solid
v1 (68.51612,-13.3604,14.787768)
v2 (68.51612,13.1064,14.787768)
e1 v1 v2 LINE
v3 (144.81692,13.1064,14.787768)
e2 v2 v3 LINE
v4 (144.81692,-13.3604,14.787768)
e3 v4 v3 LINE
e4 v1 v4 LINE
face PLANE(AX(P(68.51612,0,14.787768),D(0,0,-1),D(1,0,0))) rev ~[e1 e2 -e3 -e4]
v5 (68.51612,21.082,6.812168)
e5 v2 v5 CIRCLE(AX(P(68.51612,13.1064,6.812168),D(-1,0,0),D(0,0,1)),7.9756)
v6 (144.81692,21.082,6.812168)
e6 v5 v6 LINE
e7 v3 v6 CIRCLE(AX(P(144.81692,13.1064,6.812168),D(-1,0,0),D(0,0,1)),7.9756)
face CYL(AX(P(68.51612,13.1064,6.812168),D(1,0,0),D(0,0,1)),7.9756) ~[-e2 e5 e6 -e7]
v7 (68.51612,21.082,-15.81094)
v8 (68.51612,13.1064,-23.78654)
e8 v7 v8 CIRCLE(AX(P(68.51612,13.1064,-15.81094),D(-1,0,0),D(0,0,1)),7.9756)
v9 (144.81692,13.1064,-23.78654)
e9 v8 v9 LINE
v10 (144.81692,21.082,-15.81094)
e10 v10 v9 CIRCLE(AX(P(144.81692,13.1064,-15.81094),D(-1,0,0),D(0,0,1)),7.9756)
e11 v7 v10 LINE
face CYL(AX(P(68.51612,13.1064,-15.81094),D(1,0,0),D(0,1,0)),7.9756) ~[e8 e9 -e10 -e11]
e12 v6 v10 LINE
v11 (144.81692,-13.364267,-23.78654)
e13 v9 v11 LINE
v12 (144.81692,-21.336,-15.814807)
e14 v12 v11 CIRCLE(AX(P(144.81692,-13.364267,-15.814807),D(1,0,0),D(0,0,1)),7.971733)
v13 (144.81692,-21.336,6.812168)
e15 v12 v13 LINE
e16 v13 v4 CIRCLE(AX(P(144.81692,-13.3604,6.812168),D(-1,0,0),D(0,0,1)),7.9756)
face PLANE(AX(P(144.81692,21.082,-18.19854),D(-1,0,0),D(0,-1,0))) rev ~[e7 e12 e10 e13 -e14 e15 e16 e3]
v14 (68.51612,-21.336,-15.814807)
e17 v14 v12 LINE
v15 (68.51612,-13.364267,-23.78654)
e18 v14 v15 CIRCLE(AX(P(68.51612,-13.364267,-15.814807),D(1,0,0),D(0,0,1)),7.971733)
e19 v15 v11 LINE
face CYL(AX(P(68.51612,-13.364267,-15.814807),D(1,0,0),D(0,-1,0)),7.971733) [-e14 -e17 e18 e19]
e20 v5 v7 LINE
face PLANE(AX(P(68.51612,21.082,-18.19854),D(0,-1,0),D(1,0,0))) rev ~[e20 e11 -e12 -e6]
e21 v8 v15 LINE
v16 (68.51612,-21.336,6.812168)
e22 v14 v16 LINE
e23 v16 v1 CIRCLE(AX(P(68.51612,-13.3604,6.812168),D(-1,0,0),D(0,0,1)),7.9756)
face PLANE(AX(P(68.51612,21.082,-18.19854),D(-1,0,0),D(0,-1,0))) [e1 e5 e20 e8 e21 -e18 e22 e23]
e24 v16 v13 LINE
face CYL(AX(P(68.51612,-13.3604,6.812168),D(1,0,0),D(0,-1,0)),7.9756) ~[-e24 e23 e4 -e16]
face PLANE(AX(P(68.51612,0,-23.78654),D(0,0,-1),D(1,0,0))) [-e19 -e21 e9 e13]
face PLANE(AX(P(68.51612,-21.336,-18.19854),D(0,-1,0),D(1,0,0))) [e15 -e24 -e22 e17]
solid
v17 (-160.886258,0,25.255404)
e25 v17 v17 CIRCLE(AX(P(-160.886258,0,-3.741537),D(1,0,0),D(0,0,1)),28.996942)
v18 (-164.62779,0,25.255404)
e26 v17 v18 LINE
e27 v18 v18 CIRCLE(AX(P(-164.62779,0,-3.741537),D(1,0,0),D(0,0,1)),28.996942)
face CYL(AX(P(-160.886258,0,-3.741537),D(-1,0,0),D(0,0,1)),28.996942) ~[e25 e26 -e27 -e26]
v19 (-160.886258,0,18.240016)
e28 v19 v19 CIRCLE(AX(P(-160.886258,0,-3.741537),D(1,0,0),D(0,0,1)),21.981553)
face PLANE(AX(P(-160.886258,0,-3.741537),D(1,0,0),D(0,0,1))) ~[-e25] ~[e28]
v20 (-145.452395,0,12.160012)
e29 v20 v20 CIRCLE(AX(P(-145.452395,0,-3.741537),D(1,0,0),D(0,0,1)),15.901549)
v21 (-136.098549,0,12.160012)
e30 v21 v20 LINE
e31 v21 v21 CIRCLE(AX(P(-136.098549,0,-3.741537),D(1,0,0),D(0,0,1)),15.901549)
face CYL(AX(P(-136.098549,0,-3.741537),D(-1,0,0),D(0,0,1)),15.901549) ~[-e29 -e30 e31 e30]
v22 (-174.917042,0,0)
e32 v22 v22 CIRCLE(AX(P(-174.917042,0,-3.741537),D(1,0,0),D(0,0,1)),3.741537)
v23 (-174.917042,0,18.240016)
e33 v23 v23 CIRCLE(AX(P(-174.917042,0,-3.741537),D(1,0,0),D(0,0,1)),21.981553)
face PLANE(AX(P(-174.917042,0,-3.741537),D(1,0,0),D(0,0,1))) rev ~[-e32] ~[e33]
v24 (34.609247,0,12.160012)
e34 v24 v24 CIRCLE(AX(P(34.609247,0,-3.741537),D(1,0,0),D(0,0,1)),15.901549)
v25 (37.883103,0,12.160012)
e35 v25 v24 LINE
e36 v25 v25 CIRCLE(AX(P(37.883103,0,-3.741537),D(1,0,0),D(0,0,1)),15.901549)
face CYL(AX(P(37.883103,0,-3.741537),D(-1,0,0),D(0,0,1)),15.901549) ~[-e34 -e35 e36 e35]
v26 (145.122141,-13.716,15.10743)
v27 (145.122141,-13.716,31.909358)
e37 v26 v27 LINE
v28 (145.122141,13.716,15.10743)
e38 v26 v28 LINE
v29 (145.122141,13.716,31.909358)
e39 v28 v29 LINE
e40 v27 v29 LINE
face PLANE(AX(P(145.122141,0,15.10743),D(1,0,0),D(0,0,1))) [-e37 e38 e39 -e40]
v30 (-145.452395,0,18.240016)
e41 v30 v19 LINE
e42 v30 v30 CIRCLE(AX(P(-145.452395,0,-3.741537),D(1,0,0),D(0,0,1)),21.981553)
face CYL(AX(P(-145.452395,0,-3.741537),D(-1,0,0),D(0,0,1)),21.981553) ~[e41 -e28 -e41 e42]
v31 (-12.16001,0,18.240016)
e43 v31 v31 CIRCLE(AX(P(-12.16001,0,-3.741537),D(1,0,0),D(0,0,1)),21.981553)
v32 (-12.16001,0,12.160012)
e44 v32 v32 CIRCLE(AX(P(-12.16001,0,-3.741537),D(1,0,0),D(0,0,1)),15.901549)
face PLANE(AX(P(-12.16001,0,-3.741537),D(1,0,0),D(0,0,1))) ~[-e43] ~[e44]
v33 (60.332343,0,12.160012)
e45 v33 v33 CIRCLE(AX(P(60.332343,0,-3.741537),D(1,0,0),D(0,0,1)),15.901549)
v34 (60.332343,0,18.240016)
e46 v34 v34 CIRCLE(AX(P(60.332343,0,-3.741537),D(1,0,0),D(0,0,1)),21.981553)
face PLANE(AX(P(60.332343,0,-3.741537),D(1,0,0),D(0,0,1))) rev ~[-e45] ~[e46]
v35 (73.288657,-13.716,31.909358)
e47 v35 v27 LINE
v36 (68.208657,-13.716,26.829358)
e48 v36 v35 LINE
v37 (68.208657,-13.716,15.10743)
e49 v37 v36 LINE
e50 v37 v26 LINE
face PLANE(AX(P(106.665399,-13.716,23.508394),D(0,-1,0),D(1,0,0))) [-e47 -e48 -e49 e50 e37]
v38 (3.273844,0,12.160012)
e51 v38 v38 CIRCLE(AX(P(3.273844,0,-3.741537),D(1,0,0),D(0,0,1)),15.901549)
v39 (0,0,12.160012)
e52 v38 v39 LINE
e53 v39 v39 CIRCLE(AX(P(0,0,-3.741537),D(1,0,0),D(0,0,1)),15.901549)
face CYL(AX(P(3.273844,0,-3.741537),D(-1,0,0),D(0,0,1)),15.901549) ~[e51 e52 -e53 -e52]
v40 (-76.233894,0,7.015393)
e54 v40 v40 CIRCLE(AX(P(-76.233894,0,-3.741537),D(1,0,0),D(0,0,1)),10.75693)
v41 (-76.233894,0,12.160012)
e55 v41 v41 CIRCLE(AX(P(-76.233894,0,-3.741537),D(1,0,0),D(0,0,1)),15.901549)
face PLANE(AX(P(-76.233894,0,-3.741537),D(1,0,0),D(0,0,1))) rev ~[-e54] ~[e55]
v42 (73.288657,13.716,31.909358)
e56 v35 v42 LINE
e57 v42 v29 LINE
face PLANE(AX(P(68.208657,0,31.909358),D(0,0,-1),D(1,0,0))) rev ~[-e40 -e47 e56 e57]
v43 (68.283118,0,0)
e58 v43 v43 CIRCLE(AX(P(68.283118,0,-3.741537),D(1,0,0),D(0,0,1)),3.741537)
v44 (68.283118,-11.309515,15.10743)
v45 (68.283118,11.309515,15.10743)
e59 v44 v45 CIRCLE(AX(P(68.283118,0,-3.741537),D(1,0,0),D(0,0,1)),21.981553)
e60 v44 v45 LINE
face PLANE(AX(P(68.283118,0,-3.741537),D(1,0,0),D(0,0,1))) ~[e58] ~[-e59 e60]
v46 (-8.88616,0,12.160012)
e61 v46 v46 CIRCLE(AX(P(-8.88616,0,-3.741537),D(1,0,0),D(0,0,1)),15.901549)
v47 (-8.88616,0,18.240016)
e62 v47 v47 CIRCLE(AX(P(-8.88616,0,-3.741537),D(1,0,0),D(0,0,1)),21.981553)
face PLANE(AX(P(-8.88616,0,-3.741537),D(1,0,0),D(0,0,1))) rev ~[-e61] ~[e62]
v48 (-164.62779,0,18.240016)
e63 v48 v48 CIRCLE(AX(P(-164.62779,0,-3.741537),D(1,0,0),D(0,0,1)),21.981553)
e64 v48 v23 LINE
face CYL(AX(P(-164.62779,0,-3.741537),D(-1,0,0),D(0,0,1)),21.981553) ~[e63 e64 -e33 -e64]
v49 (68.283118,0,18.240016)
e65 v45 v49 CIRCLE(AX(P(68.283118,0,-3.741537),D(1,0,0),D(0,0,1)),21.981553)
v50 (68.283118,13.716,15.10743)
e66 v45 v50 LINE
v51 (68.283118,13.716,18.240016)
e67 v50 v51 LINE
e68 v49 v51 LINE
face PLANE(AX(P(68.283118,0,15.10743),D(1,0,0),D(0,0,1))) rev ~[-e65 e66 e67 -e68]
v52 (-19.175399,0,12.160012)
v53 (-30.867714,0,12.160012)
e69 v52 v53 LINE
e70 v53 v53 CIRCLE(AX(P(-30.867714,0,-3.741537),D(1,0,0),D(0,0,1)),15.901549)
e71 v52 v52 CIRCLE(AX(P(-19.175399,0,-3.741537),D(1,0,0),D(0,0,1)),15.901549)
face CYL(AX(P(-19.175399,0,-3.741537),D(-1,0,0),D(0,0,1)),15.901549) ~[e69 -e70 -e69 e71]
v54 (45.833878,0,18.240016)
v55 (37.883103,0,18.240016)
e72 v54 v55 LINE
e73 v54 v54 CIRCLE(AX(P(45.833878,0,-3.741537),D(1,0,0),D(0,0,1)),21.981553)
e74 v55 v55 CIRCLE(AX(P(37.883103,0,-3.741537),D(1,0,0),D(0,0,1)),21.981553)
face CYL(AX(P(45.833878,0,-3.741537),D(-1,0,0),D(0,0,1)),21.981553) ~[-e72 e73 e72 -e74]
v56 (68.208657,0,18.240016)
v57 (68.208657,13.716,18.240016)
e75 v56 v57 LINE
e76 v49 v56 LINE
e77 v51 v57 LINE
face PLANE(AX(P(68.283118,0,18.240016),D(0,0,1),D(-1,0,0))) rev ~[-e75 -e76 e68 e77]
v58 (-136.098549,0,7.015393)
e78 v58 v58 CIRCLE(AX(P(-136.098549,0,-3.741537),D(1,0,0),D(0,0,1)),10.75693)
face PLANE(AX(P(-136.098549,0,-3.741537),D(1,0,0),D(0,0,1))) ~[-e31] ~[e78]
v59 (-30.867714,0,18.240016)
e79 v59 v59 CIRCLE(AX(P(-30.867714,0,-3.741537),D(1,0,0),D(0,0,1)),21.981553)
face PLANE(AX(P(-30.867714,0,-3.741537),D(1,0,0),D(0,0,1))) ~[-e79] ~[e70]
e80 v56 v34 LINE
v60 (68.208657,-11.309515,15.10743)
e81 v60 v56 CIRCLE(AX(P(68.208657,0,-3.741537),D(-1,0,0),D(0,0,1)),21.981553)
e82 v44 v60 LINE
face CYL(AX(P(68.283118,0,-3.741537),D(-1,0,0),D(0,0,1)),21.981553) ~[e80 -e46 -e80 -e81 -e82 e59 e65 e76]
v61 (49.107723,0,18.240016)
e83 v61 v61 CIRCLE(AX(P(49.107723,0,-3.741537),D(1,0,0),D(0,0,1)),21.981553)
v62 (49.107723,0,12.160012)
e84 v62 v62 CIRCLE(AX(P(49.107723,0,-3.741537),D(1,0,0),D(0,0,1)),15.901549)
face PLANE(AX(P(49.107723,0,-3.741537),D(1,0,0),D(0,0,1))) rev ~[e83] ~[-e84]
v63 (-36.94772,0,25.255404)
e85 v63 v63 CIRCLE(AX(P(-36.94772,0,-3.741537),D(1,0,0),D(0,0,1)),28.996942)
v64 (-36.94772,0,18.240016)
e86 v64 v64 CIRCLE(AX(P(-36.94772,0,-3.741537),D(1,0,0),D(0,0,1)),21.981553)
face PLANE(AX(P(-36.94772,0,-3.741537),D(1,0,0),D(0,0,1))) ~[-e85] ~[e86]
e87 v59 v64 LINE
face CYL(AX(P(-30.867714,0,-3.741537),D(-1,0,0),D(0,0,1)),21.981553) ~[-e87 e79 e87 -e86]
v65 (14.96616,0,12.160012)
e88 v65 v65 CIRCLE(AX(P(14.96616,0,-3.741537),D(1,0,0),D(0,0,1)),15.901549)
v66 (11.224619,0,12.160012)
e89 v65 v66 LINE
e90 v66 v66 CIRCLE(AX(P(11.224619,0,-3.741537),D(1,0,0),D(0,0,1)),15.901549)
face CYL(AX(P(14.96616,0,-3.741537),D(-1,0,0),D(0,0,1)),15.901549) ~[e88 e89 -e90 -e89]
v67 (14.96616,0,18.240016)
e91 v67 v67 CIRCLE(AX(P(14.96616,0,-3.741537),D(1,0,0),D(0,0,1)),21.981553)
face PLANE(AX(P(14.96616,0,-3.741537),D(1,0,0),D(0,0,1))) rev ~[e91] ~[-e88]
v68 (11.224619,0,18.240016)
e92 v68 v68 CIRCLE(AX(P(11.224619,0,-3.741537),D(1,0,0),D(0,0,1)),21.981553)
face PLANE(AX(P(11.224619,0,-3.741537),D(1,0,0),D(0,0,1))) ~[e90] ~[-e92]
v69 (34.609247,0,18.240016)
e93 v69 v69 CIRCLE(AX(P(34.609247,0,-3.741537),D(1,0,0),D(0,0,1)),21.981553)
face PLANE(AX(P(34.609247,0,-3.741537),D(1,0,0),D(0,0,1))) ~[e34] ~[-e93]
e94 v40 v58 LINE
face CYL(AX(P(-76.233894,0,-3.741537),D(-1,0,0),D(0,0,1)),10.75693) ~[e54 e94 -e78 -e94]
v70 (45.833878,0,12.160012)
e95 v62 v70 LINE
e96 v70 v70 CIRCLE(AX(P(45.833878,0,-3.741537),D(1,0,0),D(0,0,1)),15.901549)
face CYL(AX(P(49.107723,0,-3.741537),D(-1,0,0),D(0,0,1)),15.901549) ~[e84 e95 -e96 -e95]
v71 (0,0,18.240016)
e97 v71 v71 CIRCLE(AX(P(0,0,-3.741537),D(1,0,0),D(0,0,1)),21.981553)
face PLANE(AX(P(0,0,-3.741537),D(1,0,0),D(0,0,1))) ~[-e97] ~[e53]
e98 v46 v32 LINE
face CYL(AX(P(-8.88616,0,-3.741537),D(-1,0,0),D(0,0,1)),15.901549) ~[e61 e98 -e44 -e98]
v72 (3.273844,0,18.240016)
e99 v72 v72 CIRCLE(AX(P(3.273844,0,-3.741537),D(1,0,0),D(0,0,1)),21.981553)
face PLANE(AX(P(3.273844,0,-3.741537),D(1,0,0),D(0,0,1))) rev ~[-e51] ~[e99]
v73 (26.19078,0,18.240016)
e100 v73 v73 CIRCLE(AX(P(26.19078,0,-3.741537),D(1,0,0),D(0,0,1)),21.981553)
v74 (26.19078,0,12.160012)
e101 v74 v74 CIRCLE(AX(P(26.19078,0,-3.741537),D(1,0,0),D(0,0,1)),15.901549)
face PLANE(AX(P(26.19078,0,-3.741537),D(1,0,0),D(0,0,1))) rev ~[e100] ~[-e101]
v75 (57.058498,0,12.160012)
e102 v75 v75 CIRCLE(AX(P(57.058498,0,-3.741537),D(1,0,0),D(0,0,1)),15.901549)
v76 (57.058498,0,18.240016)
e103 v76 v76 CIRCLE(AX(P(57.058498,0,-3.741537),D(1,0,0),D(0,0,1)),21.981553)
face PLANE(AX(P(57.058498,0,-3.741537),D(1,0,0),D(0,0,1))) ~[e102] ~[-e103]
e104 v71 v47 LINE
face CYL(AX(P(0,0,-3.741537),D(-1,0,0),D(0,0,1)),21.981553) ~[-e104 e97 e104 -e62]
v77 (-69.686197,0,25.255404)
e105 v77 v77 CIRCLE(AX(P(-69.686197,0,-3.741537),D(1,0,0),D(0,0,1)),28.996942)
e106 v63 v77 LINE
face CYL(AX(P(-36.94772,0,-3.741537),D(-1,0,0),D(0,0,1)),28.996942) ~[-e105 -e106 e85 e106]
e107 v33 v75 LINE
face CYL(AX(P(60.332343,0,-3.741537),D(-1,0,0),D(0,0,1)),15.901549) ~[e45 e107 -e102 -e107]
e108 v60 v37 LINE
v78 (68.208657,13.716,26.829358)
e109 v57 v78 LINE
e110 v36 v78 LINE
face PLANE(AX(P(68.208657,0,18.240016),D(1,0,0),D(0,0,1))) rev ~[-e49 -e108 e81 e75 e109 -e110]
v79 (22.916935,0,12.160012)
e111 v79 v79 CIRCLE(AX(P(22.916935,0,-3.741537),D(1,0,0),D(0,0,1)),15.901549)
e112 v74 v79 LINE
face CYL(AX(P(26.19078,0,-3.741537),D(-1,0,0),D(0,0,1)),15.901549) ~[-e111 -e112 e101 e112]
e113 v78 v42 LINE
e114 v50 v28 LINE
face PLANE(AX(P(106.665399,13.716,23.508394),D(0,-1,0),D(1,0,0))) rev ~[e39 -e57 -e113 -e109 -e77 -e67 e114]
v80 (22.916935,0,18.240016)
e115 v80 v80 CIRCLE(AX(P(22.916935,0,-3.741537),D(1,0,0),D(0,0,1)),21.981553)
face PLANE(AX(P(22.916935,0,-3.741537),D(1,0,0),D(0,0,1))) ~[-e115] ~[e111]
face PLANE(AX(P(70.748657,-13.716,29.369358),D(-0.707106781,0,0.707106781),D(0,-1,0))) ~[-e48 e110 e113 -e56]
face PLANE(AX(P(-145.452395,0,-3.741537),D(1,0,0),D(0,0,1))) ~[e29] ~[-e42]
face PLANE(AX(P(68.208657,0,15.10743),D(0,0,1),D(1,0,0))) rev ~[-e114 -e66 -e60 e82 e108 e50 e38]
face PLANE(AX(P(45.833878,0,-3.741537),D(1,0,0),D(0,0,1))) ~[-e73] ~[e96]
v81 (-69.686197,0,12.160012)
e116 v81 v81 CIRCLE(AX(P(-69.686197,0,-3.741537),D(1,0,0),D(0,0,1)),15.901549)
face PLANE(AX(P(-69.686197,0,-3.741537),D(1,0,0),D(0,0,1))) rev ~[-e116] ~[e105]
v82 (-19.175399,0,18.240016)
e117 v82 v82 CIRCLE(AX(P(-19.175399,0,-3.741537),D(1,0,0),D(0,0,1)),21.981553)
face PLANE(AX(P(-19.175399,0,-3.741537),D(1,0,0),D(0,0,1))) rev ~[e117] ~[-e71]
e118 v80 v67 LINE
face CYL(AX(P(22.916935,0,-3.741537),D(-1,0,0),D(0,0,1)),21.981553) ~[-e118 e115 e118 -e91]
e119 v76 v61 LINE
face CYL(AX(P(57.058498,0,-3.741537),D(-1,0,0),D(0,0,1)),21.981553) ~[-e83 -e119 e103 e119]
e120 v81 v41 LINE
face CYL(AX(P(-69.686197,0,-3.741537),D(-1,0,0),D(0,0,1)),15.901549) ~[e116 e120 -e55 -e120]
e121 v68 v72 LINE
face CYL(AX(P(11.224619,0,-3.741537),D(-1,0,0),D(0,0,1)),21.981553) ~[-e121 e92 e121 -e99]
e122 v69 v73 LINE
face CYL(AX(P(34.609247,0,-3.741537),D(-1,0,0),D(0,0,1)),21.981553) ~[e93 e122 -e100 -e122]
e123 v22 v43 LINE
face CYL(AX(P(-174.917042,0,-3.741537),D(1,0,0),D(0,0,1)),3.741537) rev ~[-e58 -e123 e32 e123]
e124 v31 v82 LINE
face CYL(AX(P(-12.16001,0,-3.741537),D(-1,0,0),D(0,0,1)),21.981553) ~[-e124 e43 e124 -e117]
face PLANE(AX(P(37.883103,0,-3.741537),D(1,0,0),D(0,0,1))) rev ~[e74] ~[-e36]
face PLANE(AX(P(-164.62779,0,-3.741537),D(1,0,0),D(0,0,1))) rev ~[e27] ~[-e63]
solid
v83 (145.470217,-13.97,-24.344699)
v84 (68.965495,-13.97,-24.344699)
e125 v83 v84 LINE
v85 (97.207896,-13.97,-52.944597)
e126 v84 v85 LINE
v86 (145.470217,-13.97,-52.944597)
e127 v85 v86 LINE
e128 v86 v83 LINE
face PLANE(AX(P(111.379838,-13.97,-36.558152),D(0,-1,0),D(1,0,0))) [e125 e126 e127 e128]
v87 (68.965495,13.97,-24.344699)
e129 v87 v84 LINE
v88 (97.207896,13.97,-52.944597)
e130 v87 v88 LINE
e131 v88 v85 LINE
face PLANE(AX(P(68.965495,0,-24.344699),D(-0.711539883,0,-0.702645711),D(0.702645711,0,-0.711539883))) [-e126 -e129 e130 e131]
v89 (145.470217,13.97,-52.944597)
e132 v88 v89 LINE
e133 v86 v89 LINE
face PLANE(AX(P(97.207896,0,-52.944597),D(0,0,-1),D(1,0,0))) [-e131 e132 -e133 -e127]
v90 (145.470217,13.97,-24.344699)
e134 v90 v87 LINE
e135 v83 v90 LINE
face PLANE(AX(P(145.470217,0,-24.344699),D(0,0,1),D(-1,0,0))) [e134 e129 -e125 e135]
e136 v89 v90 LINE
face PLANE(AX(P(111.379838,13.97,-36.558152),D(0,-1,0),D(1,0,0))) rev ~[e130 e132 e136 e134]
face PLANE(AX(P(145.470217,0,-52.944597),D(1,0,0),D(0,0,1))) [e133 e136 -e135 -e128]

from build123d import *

# Parameters (mm, degrees)
F2_W      = 76.3007998466
F2_H      = 29.4303083792
F3_DEPTH  = 21.336
F4_DEPTH  = 21.082
F5_DEPTH  = 3.556
F6_DEPTH  = 5.588
F7_R      = 7.971733183
F8_R      = 7.9756
F9_R      = 7.9756
F10_R     = 7.9756
F11_W     = 76.9134834409
F11_H     = 16.80192817
F12_DEPTH = 13.716
F13_DEPTH = 13.716
F14_SIZE  = 5.08
F16_DEPTH = 13.97
F17_DEPTH = 13.97


# Not quite as in the source:
# - the program builds the solid bodies; features that only make, move or delete a surface that nothing else refers to are left out


with BuildPart() as f1:
    # F0 (on Front) → F1 (revolve)
    with BuildSketch(Plane.XZ):
        Polygon((-174.9170422554, 18.2400159538), (-174.9170422554, 0), (0, 0), (68.2831183076, 0), (68.2831183076, 12.1600115672), (68.2831183076, 18.2400159538), (60.3323429823, 18.2400159538), (60.3323429823, 12.1600115672), (57.0584982634, 12.1600115672), (57.0584982634, 18.2400159538), (49.1077229381, 18.2400159538), (49.1077229381, 12.1600115672), (45.8338782191, 12.1600115672), (45.8338782191, 18.2400159538), (37.8831028938, 18.2400159538), (37.8831028938, 12.1600115672), (34.609246999, 12.1600115672), (34.609246999, 18.2400159538), (26.1907801032, 18.2400159538), (26.1907801032, 12.1600115672), (22.9169353843, 12.1600115672), (22.9169353843, 18.2400159538), (14.966160059, 18.2400159538), (14.966160059, 12.1600115672), (11.2246191129, 12.1600115672), (11.2246191129, 18.2400159538), (3.2738437876, 18.2400159538), (3.2738437876, 12.1600115672), (0, 12.1600115672), (0, 18.2400159538), (-8.886160329, 18.2400159538), (-8.886160329, 12.1600115672), (-12.1600097045, 12.1600115672), (-12.1600097045, 18.2400159538), (-19.1753990948, 18.2400159538), (-19.1753990948, 12.1600115672), (-30.8677144349, 12.1600115672), (-30.8677144349, 18.2400159538), (-36.9477197528, 18.2400159538), (-36.9477197528, 25.2554044127), (-69.6861967444, 25.2554044127), (-69.6861967444, 12.1600115672), (-76.2338936329, 12.1600115672), (-76.2338936329, 7.0153931156), (-136.09854877, 7.0153931156), (-136.09854877, 12.1600115672), (-145.4523950815, 12.1600115672), (-145.4523950815, 18.2400159538), (-160.8862578869, 18.2400159538), (-160.8862578869, 25.2554044127), (-164.627790451, 25.2554044127), (-164.627790451, 18.2400159538), align=None)
    revolve(axis=Axis((-46.7692613602, 0, -3.7415372208), (1, 0, 0)))

    # F11 (on Front) → F12 (join)
    with BuildSketch(Plane.XZ):
        with Locations((106.6653989255, 23.5083936714)):
            Rectangle(F11_W, F11_H)
    extrude(amount=F12_DEPTH)

    # F13 (add): a face of the model
    f13_faces = [f1.faces().sort_by_distance(p)[0] for p in [
        (106.6723347987, 0, 23.5096275343),
    ]]
    extrude(f13_faces, amount=F13_DEPTH)

    # F14
    f14_edges = [f1.edges().sort_by_distance(p)[0] for p in [
        (68.208657, 0, 31.909358),
    ]]
    chamfer(f14_edges, length=F14_SIZE)


with BuildPart() as f3:
    # F2 (on Front) → F3 (new body)
    with BuildSketch(Plane.XZ):
        with Locations((106.6665202379, -3.4833862446)):
            Rectangle(F2_W, F2_H)
    extrude(amount=F3_DEPTH)

    # F4 (add): a face of the model
    f4_faces = [f3.faces().sort_by_distance(p)[0] for p in [
        (106.6665202379, 0, -3.4833862446),
    ]]
    extrude(f4_faces, amount=F4_DEPTH)

    # F5 (add): a face of the model
    f5_faces = [f3.faces().sort_by_distance(p)[0] for p in [
        (106.6665202379, -0.127, 11.231767945),
    ]]
    extrude(f5_faces, amount=F5_DEPTH)

    # F6 (add): a face of the model
    f6_faces = [f3.faces().sort_by_distance(p)[0] for p in [
        (106.6665202379, -0.127, -18.1985404342),
    ]]
    extrude(f6_faces, amount=F6_DEPTH)

    # F7
    f7_edges = [f3.edges().sort_by_distance(p)[0] for p in [
        (106.66652, -21.336, -23.78654),
    ]]
    fillet(f7_edges, radius=F7_R)

    # F8
    f8_edges = [f3.edges().sort_by_distance(p)[0] for p in [
        (106.66652, -21.336, 14.787768),
    ]]
    fillet(f8_edges, radius=F8_R)

    # F9
    f9_edges = [f3.edges().sort_by_distance(p)[0] for p in [
        (106.66652, 21.082, 14.787768),
    ]]
    fillet(f9_edges, radius=F9_R)

    # F10
    f10_edges = [f3.edges().sort_by_distance(p)[0] for p in [
        (106.66652, 21.082, -23.78654),
    ]]
    fillet(f10_edges, radius=F10_R)


with BuildPart() as f16:
    # F15 (on Front) → F16 (new body)
    with BuildSketch(Plane.XZ):
        Polygon((145.4702168703, -24.3446994573), (68.9654946327, -24.3446994573), (97.2078964114, -52.9445968568), (145.4702168703, -52.9445968568), align=None)
    extrude(amount=F16_DEPTH)

    # F17 (add): a face of the model
    f17_faces = [f16.faces().sort_by_distance(p)[0] for p in [
        (113.7457078297, 0, -37.565664242),
    ]]
    extrude(f17_faces, amount=F17_DEPTH)


solid = Compound([f1.part, f3.part, f16.part])
